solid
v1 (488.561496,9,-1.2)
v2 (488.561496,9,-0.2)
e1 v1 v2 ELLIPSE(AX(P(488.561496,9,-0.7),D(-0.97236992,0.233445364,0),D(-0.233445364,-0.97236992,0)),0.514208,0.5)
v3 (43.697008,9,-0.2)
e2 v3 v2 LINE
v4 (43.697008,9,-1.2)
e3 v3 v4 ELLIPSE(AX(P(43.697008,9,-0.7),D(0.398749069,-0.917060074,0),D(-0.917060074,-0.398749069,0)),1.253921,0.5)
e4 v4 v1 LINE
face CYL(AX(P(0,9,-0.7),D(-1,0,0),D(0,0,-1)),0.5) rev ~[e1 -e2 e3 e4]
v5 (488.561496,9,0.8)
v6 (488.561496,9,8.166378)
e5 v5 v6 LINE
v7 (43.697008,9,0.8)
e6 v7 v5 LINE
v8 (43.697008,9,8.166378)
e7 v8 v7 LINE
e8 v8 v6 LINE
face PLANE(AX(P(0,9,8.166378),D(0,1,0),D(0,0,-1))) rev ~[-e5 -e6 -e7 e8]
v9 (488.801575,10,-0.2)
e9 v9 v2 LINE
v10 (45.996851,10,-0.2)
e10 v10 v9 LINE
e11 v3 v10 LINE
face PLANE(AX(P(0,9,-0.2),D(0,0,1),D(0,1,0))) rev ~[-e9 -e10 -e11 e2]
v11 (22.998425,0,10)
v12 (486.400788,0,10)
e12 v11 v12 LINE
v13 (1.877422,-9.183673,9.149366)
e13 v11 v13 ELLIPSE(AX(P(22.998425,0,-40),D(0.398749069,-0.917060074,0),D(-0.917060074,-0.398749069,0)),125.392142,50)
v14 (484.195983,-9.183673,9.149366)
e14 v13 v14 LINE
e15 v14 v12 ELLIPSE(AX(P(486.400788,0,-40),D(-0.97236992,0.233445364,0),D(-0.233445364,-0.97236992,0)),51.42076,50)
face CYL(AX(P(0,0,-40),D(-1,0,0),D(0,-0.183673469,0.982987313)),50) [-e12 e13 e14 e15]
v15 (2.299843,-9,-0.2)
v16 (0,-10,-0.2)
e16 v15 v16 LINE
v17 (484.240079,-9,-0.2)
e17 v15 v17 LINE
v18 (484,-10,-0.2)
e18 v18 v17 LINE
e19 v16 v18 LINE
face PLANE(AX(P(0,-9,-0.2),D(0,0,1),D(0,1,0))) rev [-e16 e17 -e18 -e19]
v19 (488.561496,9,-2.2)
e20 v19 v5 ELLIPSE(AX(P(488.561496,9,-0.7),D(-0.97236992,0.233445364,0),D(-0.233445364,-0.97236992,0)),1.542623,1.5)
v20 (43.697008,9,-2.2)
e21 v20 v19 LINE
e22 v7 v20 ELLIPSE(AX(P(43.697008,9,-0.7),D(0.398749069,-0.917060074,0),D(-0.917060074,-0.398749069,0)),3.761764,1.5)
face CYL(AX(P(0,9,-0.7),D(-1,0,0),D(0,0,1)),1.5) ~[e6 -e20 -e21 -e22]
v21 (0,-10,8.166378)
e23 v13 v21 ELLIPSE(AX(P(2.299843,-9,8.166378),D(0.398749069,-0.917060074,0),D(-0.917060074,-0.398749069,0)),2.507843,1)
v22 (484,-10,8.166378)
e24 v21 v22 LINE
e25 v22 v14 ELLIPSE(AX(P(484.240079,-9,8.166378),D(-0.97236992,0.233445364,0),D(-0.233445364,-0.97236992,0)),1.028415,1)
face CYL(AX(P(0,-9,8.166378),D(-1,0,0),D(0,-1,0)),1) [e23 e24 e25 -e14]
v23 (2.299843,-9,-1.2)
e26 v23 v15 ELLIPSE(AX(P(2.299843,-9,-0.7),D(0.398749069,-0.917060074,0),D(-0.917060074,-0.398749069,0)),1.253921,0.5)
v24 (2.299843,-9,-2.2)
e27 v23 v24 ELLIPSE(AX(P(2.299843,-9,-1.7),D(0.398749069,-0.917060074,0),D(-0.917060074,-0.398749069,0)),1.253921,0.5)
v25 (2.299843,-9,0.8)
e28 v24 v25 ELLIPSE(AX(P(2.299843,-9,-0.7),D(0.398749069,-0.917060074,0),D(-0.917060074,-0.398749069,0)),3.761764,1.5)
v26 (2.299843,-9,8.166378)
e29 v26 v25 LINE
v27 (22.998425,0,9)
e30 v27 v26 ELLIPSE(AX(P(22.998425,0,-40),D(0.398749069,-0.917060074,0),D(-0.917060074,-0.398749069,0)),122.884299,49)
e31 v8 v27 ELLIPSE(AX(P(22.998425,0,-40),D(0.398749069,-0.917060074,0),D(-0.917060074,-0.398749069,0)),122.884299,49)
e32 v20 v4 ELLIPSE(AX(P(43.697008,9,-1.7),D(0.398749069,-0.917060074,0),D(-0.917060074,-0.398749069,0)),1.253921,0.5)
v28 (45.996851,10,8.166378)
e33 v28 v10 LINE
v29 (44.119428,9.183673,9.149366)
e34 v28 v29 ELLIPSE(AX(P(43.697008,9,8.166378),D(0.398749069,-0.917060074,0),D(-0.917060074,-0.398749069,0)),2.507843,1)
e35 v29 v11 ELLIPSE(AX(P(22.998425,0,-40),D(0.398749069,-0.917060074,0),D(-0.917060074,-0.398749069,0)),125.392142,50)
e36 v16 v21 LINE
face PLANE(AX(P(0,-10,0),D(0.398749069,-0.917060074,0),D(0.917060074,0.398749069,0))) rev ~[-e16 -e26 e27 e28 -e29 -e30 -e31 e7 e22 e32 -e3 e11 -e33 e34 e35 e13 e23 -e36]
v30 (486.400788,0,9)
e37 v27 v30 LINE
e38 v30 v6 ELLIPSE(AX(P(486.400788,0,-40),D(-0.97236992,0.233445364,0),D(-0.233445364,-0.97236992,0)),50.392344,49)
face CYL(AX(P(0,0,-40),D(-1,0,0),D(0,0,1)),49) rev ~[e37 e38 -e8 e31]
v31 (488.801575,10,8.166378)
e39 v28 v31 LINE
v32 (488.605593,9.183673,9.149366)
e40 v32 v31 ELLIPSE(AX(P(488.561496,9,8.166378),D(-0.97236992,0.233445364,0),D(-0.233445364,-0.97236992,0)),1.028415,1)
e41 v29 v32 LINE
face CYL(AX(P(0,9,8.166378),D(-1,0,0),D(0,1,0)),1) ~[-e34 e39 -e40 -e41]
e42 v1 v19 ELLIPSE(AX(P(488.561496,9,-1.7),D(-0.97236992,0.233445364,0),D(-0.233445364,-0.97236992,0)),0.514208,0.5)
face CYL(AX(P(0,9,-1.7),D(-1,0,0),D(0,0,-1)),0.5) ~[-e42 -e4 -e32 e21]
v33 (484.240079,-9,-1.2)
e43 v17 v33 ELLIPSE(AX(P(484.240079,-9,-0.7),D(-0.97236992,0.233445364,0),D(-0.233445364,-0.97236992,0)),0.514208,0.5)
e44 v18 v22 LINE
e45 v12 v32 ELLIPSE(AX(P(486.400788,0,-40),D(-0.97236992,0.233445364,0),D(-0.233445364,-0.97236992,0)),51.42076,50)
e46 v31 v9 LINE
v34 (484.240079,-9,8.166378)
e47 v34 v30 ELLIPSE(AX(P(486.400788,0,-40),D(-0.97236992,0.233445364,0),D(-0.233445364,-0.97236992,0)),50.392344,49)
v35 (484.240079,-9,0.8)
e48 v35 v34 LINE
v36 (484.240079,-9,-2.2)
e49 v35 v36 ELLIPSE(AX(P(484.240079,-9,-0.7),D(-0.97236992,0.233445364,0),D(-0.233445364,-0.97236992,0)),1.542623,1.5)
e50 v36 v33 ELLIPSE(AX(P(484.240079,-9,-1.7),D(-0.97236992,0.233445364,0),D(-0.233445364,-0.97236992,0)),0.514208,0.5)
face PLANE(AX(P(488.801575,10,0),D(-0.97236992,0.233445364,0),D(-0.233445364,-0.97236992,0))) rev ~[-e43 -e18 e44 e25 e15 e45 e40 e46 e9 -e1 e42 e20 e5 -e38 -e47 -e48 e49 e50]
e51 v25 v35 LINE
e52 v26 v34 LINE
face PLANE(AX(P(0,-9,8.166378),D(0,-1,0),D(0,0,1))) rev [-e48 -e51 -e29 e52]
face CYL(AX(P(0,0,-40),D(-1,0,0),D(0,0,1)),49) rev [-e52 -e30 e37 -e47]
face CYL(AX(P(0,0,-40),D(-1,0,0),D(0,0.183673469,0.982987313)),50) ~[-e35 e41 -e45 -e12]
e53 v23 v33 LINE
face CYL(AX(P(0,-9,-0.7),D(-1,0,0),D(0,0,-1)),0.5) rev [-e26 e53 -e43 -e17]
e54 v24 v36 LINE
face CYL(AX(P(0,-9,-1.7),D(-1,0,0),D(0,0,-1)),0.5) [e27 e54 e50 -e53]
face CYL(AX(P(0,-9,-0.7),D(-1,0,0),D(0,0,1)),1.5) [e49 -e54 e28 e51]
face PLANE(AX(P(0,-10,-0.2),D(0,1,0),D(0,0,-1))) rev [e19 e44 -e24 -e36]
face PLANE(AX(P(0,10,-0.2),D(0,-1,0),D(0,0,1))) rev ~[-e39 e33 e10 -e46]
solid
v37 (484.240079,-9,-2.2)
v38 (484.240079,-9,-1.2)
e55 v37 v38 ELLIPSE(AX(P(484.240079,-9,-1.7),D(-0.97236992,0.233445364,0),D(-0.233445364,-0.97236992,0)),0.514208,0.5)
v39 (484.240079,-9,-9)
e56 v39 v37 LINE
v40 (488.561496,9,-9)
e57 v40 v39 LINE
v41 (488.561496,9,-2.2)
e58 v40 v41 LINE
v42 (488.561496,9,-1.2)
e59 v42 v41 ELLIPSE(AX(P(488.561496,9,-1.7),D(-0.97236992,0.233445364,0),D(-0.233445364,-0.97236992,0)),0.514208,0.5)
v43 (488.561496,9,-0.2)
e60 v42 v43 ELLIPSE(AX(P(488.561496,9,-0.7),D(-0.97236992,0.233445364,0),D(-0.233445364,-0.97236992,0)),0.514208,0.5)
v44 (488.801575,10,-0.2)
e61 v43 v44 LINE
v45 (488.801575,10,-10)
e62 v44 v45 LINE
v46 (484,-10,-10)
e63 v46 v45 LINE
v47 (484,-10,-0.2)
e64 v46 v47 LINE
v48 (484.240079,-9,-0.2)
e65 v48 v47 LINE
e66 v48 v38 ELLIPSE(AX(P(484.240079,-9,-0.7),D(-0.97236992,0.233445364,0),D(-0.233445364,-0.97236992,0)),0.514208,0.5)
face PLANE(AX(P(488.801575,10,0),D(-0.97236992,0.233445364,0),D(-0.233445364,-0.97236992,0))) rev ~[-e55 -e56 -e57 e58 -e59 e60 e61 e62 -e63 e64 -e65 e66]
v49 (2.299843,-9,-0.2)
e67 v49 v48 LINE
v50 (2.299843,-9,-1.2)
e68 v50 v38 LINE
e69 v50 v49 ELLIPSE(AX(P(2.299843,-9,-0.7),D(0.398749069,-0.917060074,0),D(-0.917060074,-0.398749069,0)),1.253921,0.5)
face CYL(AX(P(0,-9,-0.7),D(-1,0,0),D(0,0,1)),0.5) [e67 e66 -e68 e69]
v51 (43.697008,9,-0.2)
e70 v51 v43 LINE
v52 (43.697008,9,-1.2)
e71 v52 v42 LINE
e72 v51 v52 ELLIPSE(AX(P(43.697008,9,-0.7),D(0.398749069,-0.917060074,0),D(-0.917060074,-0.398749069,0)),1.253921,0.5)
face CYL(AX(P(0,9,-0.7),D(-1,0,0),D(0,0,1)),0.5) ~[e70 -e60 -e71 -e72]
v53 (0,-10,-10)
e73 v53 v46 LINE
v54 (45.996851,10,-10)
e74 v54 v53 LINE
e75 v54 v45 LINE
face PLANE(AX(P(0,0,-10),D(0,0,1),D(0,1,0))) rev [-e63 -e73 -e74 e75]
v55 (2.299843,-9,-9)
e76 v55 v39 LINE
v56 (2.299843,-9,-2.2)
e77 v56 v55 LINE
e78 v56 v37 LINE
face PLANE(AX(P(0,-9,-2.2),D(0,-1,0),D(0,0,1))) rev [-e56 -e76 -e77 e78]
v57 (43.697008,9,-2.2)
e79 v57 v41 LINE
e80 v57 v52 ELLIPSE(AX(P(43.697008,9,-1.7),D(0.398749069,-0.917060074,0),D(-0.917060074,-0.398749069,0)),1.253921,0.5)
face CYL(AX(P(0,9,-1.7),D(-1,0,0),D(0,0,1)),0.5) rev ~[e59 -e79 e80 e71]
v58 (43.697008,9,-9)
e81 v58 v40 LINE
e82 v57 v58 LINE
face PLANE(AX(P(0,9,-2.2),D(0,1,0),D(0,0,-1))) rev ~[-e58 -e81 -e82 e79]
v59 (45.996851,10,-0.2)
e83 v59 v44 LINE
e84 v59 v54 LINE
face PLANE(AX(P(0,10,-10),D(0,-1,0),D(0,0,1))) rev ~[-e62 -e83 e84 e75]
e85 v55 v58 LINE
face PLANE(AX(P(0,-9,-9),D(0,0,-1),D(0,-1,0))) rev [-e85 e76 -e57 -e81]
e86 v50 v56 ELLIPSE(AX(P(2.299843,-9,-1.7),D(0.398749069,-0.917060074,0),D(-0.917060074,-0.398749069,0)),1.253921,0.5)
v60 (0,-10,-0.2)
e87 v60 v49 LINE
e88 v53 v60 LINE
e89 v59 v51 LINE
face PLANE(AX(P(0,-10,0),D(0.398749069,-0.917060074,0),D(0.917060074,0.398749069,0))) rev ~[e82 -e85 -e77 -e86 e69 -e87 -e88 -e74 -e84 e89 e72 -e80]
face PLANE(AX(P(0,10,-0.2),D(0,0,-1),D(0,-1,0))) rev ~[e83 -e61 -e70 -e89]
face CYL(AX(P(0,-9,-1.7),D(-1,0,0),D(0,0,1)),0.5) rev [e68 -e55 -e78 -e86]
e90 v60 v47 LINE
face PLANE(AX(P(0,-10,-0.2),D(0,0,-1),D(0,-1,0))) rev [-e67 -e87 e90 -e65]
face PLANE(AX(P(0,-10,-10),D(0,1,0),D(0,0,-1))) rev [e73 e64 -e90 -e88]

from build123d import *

# Parameters (mm, degrees)
F2_DEPTH      = 1000
F4_DEPTH      = 1000
F8_DEPTH      = 10.001
F8_DEPTH_BACK = 10.001


with BuildPart() as f2:
    # F1 (on Right) → F2 (new body)
    with BuildSketch(Plane.YZ):
        with BuildLine():
            Line((0, -9), (0, -10))
            Line((0, -10), (10, -10))
            Line((10, -10), (10, -0.2))
            Line((10, -0.2), (9, -0.2))
            ThreePointArc((9, -0.2), (8.5, -0.7), (9, -1.2))
            ThreePointArc((9, -1.2), (9.5, -1.7), (9, -2.2))
            Line((9, -2.2), (9, -9))
            Line((9, -9), (0, -9))
        make_face()
    extrude(amount=F2_DEPTH)

    # F5: F2 across plane


with BuildPart() as f4:
    # F3 (on Right) → F4 (new body)
    with BuildSketch(Plane.YZ):
        with BuildLine():
            Line((9, -0.2), (10, -0.2))
            Line((10, -0.2), (10, 8.1663783152))
            ThreePointArc((10, 8.1663783152), (9.7693092582, 8.8052548802), (9.1836734694, 9.1493656277))
            ThreePointArc((9.1836734694, 9.1493656277), (4.6114920912, 9.7868872364), (0, 10))
            Line((0, 10), (0, 9))
            ThreePointArc((0, 9), (4.5192622493, 8.7911494917), (9, 8.1663783152))
            Line((9, 8.1663783152), (9, 0.8))
            ThreePointArc((9, 0.8), (7.5, -0.7), (9, -2.2))
            ThreePointArc((9, -2.2), (9.5, -1.7), (9, -1.2))
            ThreePointArc((9, -1.2), (8.5, -0.7), (9, -0.2))
        make_face()
    extrude(amount=F4_DEPTH)

    # F6: F4 across plane


with BuildPart() as f2_1:
    add(f2.part)
    add(f2.part.mirror(Plane.XZ))


with BuildPart() as f4_1:
    add(f4.part)
    add(f4.part.mirror(Plane.XZ))


with BuildPart() as f8_tool:
    # F7 (on Top) → F8 (new body, two sides)
    with BuildSketch(Plane.XY) as f8_sk:
        Polygon((0, 10), (0, 0), (0, -10), (45.9968509447, 10), align=None)
        Polygon((709.9114181152, 10), (488.8015751816, 10), (484, -10), (1016.9613361359, -10), (1016.9613361359, 10), align=None)
    extrude(amount=F8_DEPTH)
    extrude(f8_sk.sketch, amount=-F8_DEPTH_BACK)


with BuildPart() as f2_2:
    add(f2_1.part)

    # F8: cut by f8_tool
    add(f8_tool.part, mode=Mode.SUBTRACT)


with BuildPart() as f4_2:
    add(f4_1.part)

    # F8: cut by f8_tool
    add(f8_tool.part, mode=Mode.SUBTRACT)


solid = Compound([f2_2.part, f4_2.part])
